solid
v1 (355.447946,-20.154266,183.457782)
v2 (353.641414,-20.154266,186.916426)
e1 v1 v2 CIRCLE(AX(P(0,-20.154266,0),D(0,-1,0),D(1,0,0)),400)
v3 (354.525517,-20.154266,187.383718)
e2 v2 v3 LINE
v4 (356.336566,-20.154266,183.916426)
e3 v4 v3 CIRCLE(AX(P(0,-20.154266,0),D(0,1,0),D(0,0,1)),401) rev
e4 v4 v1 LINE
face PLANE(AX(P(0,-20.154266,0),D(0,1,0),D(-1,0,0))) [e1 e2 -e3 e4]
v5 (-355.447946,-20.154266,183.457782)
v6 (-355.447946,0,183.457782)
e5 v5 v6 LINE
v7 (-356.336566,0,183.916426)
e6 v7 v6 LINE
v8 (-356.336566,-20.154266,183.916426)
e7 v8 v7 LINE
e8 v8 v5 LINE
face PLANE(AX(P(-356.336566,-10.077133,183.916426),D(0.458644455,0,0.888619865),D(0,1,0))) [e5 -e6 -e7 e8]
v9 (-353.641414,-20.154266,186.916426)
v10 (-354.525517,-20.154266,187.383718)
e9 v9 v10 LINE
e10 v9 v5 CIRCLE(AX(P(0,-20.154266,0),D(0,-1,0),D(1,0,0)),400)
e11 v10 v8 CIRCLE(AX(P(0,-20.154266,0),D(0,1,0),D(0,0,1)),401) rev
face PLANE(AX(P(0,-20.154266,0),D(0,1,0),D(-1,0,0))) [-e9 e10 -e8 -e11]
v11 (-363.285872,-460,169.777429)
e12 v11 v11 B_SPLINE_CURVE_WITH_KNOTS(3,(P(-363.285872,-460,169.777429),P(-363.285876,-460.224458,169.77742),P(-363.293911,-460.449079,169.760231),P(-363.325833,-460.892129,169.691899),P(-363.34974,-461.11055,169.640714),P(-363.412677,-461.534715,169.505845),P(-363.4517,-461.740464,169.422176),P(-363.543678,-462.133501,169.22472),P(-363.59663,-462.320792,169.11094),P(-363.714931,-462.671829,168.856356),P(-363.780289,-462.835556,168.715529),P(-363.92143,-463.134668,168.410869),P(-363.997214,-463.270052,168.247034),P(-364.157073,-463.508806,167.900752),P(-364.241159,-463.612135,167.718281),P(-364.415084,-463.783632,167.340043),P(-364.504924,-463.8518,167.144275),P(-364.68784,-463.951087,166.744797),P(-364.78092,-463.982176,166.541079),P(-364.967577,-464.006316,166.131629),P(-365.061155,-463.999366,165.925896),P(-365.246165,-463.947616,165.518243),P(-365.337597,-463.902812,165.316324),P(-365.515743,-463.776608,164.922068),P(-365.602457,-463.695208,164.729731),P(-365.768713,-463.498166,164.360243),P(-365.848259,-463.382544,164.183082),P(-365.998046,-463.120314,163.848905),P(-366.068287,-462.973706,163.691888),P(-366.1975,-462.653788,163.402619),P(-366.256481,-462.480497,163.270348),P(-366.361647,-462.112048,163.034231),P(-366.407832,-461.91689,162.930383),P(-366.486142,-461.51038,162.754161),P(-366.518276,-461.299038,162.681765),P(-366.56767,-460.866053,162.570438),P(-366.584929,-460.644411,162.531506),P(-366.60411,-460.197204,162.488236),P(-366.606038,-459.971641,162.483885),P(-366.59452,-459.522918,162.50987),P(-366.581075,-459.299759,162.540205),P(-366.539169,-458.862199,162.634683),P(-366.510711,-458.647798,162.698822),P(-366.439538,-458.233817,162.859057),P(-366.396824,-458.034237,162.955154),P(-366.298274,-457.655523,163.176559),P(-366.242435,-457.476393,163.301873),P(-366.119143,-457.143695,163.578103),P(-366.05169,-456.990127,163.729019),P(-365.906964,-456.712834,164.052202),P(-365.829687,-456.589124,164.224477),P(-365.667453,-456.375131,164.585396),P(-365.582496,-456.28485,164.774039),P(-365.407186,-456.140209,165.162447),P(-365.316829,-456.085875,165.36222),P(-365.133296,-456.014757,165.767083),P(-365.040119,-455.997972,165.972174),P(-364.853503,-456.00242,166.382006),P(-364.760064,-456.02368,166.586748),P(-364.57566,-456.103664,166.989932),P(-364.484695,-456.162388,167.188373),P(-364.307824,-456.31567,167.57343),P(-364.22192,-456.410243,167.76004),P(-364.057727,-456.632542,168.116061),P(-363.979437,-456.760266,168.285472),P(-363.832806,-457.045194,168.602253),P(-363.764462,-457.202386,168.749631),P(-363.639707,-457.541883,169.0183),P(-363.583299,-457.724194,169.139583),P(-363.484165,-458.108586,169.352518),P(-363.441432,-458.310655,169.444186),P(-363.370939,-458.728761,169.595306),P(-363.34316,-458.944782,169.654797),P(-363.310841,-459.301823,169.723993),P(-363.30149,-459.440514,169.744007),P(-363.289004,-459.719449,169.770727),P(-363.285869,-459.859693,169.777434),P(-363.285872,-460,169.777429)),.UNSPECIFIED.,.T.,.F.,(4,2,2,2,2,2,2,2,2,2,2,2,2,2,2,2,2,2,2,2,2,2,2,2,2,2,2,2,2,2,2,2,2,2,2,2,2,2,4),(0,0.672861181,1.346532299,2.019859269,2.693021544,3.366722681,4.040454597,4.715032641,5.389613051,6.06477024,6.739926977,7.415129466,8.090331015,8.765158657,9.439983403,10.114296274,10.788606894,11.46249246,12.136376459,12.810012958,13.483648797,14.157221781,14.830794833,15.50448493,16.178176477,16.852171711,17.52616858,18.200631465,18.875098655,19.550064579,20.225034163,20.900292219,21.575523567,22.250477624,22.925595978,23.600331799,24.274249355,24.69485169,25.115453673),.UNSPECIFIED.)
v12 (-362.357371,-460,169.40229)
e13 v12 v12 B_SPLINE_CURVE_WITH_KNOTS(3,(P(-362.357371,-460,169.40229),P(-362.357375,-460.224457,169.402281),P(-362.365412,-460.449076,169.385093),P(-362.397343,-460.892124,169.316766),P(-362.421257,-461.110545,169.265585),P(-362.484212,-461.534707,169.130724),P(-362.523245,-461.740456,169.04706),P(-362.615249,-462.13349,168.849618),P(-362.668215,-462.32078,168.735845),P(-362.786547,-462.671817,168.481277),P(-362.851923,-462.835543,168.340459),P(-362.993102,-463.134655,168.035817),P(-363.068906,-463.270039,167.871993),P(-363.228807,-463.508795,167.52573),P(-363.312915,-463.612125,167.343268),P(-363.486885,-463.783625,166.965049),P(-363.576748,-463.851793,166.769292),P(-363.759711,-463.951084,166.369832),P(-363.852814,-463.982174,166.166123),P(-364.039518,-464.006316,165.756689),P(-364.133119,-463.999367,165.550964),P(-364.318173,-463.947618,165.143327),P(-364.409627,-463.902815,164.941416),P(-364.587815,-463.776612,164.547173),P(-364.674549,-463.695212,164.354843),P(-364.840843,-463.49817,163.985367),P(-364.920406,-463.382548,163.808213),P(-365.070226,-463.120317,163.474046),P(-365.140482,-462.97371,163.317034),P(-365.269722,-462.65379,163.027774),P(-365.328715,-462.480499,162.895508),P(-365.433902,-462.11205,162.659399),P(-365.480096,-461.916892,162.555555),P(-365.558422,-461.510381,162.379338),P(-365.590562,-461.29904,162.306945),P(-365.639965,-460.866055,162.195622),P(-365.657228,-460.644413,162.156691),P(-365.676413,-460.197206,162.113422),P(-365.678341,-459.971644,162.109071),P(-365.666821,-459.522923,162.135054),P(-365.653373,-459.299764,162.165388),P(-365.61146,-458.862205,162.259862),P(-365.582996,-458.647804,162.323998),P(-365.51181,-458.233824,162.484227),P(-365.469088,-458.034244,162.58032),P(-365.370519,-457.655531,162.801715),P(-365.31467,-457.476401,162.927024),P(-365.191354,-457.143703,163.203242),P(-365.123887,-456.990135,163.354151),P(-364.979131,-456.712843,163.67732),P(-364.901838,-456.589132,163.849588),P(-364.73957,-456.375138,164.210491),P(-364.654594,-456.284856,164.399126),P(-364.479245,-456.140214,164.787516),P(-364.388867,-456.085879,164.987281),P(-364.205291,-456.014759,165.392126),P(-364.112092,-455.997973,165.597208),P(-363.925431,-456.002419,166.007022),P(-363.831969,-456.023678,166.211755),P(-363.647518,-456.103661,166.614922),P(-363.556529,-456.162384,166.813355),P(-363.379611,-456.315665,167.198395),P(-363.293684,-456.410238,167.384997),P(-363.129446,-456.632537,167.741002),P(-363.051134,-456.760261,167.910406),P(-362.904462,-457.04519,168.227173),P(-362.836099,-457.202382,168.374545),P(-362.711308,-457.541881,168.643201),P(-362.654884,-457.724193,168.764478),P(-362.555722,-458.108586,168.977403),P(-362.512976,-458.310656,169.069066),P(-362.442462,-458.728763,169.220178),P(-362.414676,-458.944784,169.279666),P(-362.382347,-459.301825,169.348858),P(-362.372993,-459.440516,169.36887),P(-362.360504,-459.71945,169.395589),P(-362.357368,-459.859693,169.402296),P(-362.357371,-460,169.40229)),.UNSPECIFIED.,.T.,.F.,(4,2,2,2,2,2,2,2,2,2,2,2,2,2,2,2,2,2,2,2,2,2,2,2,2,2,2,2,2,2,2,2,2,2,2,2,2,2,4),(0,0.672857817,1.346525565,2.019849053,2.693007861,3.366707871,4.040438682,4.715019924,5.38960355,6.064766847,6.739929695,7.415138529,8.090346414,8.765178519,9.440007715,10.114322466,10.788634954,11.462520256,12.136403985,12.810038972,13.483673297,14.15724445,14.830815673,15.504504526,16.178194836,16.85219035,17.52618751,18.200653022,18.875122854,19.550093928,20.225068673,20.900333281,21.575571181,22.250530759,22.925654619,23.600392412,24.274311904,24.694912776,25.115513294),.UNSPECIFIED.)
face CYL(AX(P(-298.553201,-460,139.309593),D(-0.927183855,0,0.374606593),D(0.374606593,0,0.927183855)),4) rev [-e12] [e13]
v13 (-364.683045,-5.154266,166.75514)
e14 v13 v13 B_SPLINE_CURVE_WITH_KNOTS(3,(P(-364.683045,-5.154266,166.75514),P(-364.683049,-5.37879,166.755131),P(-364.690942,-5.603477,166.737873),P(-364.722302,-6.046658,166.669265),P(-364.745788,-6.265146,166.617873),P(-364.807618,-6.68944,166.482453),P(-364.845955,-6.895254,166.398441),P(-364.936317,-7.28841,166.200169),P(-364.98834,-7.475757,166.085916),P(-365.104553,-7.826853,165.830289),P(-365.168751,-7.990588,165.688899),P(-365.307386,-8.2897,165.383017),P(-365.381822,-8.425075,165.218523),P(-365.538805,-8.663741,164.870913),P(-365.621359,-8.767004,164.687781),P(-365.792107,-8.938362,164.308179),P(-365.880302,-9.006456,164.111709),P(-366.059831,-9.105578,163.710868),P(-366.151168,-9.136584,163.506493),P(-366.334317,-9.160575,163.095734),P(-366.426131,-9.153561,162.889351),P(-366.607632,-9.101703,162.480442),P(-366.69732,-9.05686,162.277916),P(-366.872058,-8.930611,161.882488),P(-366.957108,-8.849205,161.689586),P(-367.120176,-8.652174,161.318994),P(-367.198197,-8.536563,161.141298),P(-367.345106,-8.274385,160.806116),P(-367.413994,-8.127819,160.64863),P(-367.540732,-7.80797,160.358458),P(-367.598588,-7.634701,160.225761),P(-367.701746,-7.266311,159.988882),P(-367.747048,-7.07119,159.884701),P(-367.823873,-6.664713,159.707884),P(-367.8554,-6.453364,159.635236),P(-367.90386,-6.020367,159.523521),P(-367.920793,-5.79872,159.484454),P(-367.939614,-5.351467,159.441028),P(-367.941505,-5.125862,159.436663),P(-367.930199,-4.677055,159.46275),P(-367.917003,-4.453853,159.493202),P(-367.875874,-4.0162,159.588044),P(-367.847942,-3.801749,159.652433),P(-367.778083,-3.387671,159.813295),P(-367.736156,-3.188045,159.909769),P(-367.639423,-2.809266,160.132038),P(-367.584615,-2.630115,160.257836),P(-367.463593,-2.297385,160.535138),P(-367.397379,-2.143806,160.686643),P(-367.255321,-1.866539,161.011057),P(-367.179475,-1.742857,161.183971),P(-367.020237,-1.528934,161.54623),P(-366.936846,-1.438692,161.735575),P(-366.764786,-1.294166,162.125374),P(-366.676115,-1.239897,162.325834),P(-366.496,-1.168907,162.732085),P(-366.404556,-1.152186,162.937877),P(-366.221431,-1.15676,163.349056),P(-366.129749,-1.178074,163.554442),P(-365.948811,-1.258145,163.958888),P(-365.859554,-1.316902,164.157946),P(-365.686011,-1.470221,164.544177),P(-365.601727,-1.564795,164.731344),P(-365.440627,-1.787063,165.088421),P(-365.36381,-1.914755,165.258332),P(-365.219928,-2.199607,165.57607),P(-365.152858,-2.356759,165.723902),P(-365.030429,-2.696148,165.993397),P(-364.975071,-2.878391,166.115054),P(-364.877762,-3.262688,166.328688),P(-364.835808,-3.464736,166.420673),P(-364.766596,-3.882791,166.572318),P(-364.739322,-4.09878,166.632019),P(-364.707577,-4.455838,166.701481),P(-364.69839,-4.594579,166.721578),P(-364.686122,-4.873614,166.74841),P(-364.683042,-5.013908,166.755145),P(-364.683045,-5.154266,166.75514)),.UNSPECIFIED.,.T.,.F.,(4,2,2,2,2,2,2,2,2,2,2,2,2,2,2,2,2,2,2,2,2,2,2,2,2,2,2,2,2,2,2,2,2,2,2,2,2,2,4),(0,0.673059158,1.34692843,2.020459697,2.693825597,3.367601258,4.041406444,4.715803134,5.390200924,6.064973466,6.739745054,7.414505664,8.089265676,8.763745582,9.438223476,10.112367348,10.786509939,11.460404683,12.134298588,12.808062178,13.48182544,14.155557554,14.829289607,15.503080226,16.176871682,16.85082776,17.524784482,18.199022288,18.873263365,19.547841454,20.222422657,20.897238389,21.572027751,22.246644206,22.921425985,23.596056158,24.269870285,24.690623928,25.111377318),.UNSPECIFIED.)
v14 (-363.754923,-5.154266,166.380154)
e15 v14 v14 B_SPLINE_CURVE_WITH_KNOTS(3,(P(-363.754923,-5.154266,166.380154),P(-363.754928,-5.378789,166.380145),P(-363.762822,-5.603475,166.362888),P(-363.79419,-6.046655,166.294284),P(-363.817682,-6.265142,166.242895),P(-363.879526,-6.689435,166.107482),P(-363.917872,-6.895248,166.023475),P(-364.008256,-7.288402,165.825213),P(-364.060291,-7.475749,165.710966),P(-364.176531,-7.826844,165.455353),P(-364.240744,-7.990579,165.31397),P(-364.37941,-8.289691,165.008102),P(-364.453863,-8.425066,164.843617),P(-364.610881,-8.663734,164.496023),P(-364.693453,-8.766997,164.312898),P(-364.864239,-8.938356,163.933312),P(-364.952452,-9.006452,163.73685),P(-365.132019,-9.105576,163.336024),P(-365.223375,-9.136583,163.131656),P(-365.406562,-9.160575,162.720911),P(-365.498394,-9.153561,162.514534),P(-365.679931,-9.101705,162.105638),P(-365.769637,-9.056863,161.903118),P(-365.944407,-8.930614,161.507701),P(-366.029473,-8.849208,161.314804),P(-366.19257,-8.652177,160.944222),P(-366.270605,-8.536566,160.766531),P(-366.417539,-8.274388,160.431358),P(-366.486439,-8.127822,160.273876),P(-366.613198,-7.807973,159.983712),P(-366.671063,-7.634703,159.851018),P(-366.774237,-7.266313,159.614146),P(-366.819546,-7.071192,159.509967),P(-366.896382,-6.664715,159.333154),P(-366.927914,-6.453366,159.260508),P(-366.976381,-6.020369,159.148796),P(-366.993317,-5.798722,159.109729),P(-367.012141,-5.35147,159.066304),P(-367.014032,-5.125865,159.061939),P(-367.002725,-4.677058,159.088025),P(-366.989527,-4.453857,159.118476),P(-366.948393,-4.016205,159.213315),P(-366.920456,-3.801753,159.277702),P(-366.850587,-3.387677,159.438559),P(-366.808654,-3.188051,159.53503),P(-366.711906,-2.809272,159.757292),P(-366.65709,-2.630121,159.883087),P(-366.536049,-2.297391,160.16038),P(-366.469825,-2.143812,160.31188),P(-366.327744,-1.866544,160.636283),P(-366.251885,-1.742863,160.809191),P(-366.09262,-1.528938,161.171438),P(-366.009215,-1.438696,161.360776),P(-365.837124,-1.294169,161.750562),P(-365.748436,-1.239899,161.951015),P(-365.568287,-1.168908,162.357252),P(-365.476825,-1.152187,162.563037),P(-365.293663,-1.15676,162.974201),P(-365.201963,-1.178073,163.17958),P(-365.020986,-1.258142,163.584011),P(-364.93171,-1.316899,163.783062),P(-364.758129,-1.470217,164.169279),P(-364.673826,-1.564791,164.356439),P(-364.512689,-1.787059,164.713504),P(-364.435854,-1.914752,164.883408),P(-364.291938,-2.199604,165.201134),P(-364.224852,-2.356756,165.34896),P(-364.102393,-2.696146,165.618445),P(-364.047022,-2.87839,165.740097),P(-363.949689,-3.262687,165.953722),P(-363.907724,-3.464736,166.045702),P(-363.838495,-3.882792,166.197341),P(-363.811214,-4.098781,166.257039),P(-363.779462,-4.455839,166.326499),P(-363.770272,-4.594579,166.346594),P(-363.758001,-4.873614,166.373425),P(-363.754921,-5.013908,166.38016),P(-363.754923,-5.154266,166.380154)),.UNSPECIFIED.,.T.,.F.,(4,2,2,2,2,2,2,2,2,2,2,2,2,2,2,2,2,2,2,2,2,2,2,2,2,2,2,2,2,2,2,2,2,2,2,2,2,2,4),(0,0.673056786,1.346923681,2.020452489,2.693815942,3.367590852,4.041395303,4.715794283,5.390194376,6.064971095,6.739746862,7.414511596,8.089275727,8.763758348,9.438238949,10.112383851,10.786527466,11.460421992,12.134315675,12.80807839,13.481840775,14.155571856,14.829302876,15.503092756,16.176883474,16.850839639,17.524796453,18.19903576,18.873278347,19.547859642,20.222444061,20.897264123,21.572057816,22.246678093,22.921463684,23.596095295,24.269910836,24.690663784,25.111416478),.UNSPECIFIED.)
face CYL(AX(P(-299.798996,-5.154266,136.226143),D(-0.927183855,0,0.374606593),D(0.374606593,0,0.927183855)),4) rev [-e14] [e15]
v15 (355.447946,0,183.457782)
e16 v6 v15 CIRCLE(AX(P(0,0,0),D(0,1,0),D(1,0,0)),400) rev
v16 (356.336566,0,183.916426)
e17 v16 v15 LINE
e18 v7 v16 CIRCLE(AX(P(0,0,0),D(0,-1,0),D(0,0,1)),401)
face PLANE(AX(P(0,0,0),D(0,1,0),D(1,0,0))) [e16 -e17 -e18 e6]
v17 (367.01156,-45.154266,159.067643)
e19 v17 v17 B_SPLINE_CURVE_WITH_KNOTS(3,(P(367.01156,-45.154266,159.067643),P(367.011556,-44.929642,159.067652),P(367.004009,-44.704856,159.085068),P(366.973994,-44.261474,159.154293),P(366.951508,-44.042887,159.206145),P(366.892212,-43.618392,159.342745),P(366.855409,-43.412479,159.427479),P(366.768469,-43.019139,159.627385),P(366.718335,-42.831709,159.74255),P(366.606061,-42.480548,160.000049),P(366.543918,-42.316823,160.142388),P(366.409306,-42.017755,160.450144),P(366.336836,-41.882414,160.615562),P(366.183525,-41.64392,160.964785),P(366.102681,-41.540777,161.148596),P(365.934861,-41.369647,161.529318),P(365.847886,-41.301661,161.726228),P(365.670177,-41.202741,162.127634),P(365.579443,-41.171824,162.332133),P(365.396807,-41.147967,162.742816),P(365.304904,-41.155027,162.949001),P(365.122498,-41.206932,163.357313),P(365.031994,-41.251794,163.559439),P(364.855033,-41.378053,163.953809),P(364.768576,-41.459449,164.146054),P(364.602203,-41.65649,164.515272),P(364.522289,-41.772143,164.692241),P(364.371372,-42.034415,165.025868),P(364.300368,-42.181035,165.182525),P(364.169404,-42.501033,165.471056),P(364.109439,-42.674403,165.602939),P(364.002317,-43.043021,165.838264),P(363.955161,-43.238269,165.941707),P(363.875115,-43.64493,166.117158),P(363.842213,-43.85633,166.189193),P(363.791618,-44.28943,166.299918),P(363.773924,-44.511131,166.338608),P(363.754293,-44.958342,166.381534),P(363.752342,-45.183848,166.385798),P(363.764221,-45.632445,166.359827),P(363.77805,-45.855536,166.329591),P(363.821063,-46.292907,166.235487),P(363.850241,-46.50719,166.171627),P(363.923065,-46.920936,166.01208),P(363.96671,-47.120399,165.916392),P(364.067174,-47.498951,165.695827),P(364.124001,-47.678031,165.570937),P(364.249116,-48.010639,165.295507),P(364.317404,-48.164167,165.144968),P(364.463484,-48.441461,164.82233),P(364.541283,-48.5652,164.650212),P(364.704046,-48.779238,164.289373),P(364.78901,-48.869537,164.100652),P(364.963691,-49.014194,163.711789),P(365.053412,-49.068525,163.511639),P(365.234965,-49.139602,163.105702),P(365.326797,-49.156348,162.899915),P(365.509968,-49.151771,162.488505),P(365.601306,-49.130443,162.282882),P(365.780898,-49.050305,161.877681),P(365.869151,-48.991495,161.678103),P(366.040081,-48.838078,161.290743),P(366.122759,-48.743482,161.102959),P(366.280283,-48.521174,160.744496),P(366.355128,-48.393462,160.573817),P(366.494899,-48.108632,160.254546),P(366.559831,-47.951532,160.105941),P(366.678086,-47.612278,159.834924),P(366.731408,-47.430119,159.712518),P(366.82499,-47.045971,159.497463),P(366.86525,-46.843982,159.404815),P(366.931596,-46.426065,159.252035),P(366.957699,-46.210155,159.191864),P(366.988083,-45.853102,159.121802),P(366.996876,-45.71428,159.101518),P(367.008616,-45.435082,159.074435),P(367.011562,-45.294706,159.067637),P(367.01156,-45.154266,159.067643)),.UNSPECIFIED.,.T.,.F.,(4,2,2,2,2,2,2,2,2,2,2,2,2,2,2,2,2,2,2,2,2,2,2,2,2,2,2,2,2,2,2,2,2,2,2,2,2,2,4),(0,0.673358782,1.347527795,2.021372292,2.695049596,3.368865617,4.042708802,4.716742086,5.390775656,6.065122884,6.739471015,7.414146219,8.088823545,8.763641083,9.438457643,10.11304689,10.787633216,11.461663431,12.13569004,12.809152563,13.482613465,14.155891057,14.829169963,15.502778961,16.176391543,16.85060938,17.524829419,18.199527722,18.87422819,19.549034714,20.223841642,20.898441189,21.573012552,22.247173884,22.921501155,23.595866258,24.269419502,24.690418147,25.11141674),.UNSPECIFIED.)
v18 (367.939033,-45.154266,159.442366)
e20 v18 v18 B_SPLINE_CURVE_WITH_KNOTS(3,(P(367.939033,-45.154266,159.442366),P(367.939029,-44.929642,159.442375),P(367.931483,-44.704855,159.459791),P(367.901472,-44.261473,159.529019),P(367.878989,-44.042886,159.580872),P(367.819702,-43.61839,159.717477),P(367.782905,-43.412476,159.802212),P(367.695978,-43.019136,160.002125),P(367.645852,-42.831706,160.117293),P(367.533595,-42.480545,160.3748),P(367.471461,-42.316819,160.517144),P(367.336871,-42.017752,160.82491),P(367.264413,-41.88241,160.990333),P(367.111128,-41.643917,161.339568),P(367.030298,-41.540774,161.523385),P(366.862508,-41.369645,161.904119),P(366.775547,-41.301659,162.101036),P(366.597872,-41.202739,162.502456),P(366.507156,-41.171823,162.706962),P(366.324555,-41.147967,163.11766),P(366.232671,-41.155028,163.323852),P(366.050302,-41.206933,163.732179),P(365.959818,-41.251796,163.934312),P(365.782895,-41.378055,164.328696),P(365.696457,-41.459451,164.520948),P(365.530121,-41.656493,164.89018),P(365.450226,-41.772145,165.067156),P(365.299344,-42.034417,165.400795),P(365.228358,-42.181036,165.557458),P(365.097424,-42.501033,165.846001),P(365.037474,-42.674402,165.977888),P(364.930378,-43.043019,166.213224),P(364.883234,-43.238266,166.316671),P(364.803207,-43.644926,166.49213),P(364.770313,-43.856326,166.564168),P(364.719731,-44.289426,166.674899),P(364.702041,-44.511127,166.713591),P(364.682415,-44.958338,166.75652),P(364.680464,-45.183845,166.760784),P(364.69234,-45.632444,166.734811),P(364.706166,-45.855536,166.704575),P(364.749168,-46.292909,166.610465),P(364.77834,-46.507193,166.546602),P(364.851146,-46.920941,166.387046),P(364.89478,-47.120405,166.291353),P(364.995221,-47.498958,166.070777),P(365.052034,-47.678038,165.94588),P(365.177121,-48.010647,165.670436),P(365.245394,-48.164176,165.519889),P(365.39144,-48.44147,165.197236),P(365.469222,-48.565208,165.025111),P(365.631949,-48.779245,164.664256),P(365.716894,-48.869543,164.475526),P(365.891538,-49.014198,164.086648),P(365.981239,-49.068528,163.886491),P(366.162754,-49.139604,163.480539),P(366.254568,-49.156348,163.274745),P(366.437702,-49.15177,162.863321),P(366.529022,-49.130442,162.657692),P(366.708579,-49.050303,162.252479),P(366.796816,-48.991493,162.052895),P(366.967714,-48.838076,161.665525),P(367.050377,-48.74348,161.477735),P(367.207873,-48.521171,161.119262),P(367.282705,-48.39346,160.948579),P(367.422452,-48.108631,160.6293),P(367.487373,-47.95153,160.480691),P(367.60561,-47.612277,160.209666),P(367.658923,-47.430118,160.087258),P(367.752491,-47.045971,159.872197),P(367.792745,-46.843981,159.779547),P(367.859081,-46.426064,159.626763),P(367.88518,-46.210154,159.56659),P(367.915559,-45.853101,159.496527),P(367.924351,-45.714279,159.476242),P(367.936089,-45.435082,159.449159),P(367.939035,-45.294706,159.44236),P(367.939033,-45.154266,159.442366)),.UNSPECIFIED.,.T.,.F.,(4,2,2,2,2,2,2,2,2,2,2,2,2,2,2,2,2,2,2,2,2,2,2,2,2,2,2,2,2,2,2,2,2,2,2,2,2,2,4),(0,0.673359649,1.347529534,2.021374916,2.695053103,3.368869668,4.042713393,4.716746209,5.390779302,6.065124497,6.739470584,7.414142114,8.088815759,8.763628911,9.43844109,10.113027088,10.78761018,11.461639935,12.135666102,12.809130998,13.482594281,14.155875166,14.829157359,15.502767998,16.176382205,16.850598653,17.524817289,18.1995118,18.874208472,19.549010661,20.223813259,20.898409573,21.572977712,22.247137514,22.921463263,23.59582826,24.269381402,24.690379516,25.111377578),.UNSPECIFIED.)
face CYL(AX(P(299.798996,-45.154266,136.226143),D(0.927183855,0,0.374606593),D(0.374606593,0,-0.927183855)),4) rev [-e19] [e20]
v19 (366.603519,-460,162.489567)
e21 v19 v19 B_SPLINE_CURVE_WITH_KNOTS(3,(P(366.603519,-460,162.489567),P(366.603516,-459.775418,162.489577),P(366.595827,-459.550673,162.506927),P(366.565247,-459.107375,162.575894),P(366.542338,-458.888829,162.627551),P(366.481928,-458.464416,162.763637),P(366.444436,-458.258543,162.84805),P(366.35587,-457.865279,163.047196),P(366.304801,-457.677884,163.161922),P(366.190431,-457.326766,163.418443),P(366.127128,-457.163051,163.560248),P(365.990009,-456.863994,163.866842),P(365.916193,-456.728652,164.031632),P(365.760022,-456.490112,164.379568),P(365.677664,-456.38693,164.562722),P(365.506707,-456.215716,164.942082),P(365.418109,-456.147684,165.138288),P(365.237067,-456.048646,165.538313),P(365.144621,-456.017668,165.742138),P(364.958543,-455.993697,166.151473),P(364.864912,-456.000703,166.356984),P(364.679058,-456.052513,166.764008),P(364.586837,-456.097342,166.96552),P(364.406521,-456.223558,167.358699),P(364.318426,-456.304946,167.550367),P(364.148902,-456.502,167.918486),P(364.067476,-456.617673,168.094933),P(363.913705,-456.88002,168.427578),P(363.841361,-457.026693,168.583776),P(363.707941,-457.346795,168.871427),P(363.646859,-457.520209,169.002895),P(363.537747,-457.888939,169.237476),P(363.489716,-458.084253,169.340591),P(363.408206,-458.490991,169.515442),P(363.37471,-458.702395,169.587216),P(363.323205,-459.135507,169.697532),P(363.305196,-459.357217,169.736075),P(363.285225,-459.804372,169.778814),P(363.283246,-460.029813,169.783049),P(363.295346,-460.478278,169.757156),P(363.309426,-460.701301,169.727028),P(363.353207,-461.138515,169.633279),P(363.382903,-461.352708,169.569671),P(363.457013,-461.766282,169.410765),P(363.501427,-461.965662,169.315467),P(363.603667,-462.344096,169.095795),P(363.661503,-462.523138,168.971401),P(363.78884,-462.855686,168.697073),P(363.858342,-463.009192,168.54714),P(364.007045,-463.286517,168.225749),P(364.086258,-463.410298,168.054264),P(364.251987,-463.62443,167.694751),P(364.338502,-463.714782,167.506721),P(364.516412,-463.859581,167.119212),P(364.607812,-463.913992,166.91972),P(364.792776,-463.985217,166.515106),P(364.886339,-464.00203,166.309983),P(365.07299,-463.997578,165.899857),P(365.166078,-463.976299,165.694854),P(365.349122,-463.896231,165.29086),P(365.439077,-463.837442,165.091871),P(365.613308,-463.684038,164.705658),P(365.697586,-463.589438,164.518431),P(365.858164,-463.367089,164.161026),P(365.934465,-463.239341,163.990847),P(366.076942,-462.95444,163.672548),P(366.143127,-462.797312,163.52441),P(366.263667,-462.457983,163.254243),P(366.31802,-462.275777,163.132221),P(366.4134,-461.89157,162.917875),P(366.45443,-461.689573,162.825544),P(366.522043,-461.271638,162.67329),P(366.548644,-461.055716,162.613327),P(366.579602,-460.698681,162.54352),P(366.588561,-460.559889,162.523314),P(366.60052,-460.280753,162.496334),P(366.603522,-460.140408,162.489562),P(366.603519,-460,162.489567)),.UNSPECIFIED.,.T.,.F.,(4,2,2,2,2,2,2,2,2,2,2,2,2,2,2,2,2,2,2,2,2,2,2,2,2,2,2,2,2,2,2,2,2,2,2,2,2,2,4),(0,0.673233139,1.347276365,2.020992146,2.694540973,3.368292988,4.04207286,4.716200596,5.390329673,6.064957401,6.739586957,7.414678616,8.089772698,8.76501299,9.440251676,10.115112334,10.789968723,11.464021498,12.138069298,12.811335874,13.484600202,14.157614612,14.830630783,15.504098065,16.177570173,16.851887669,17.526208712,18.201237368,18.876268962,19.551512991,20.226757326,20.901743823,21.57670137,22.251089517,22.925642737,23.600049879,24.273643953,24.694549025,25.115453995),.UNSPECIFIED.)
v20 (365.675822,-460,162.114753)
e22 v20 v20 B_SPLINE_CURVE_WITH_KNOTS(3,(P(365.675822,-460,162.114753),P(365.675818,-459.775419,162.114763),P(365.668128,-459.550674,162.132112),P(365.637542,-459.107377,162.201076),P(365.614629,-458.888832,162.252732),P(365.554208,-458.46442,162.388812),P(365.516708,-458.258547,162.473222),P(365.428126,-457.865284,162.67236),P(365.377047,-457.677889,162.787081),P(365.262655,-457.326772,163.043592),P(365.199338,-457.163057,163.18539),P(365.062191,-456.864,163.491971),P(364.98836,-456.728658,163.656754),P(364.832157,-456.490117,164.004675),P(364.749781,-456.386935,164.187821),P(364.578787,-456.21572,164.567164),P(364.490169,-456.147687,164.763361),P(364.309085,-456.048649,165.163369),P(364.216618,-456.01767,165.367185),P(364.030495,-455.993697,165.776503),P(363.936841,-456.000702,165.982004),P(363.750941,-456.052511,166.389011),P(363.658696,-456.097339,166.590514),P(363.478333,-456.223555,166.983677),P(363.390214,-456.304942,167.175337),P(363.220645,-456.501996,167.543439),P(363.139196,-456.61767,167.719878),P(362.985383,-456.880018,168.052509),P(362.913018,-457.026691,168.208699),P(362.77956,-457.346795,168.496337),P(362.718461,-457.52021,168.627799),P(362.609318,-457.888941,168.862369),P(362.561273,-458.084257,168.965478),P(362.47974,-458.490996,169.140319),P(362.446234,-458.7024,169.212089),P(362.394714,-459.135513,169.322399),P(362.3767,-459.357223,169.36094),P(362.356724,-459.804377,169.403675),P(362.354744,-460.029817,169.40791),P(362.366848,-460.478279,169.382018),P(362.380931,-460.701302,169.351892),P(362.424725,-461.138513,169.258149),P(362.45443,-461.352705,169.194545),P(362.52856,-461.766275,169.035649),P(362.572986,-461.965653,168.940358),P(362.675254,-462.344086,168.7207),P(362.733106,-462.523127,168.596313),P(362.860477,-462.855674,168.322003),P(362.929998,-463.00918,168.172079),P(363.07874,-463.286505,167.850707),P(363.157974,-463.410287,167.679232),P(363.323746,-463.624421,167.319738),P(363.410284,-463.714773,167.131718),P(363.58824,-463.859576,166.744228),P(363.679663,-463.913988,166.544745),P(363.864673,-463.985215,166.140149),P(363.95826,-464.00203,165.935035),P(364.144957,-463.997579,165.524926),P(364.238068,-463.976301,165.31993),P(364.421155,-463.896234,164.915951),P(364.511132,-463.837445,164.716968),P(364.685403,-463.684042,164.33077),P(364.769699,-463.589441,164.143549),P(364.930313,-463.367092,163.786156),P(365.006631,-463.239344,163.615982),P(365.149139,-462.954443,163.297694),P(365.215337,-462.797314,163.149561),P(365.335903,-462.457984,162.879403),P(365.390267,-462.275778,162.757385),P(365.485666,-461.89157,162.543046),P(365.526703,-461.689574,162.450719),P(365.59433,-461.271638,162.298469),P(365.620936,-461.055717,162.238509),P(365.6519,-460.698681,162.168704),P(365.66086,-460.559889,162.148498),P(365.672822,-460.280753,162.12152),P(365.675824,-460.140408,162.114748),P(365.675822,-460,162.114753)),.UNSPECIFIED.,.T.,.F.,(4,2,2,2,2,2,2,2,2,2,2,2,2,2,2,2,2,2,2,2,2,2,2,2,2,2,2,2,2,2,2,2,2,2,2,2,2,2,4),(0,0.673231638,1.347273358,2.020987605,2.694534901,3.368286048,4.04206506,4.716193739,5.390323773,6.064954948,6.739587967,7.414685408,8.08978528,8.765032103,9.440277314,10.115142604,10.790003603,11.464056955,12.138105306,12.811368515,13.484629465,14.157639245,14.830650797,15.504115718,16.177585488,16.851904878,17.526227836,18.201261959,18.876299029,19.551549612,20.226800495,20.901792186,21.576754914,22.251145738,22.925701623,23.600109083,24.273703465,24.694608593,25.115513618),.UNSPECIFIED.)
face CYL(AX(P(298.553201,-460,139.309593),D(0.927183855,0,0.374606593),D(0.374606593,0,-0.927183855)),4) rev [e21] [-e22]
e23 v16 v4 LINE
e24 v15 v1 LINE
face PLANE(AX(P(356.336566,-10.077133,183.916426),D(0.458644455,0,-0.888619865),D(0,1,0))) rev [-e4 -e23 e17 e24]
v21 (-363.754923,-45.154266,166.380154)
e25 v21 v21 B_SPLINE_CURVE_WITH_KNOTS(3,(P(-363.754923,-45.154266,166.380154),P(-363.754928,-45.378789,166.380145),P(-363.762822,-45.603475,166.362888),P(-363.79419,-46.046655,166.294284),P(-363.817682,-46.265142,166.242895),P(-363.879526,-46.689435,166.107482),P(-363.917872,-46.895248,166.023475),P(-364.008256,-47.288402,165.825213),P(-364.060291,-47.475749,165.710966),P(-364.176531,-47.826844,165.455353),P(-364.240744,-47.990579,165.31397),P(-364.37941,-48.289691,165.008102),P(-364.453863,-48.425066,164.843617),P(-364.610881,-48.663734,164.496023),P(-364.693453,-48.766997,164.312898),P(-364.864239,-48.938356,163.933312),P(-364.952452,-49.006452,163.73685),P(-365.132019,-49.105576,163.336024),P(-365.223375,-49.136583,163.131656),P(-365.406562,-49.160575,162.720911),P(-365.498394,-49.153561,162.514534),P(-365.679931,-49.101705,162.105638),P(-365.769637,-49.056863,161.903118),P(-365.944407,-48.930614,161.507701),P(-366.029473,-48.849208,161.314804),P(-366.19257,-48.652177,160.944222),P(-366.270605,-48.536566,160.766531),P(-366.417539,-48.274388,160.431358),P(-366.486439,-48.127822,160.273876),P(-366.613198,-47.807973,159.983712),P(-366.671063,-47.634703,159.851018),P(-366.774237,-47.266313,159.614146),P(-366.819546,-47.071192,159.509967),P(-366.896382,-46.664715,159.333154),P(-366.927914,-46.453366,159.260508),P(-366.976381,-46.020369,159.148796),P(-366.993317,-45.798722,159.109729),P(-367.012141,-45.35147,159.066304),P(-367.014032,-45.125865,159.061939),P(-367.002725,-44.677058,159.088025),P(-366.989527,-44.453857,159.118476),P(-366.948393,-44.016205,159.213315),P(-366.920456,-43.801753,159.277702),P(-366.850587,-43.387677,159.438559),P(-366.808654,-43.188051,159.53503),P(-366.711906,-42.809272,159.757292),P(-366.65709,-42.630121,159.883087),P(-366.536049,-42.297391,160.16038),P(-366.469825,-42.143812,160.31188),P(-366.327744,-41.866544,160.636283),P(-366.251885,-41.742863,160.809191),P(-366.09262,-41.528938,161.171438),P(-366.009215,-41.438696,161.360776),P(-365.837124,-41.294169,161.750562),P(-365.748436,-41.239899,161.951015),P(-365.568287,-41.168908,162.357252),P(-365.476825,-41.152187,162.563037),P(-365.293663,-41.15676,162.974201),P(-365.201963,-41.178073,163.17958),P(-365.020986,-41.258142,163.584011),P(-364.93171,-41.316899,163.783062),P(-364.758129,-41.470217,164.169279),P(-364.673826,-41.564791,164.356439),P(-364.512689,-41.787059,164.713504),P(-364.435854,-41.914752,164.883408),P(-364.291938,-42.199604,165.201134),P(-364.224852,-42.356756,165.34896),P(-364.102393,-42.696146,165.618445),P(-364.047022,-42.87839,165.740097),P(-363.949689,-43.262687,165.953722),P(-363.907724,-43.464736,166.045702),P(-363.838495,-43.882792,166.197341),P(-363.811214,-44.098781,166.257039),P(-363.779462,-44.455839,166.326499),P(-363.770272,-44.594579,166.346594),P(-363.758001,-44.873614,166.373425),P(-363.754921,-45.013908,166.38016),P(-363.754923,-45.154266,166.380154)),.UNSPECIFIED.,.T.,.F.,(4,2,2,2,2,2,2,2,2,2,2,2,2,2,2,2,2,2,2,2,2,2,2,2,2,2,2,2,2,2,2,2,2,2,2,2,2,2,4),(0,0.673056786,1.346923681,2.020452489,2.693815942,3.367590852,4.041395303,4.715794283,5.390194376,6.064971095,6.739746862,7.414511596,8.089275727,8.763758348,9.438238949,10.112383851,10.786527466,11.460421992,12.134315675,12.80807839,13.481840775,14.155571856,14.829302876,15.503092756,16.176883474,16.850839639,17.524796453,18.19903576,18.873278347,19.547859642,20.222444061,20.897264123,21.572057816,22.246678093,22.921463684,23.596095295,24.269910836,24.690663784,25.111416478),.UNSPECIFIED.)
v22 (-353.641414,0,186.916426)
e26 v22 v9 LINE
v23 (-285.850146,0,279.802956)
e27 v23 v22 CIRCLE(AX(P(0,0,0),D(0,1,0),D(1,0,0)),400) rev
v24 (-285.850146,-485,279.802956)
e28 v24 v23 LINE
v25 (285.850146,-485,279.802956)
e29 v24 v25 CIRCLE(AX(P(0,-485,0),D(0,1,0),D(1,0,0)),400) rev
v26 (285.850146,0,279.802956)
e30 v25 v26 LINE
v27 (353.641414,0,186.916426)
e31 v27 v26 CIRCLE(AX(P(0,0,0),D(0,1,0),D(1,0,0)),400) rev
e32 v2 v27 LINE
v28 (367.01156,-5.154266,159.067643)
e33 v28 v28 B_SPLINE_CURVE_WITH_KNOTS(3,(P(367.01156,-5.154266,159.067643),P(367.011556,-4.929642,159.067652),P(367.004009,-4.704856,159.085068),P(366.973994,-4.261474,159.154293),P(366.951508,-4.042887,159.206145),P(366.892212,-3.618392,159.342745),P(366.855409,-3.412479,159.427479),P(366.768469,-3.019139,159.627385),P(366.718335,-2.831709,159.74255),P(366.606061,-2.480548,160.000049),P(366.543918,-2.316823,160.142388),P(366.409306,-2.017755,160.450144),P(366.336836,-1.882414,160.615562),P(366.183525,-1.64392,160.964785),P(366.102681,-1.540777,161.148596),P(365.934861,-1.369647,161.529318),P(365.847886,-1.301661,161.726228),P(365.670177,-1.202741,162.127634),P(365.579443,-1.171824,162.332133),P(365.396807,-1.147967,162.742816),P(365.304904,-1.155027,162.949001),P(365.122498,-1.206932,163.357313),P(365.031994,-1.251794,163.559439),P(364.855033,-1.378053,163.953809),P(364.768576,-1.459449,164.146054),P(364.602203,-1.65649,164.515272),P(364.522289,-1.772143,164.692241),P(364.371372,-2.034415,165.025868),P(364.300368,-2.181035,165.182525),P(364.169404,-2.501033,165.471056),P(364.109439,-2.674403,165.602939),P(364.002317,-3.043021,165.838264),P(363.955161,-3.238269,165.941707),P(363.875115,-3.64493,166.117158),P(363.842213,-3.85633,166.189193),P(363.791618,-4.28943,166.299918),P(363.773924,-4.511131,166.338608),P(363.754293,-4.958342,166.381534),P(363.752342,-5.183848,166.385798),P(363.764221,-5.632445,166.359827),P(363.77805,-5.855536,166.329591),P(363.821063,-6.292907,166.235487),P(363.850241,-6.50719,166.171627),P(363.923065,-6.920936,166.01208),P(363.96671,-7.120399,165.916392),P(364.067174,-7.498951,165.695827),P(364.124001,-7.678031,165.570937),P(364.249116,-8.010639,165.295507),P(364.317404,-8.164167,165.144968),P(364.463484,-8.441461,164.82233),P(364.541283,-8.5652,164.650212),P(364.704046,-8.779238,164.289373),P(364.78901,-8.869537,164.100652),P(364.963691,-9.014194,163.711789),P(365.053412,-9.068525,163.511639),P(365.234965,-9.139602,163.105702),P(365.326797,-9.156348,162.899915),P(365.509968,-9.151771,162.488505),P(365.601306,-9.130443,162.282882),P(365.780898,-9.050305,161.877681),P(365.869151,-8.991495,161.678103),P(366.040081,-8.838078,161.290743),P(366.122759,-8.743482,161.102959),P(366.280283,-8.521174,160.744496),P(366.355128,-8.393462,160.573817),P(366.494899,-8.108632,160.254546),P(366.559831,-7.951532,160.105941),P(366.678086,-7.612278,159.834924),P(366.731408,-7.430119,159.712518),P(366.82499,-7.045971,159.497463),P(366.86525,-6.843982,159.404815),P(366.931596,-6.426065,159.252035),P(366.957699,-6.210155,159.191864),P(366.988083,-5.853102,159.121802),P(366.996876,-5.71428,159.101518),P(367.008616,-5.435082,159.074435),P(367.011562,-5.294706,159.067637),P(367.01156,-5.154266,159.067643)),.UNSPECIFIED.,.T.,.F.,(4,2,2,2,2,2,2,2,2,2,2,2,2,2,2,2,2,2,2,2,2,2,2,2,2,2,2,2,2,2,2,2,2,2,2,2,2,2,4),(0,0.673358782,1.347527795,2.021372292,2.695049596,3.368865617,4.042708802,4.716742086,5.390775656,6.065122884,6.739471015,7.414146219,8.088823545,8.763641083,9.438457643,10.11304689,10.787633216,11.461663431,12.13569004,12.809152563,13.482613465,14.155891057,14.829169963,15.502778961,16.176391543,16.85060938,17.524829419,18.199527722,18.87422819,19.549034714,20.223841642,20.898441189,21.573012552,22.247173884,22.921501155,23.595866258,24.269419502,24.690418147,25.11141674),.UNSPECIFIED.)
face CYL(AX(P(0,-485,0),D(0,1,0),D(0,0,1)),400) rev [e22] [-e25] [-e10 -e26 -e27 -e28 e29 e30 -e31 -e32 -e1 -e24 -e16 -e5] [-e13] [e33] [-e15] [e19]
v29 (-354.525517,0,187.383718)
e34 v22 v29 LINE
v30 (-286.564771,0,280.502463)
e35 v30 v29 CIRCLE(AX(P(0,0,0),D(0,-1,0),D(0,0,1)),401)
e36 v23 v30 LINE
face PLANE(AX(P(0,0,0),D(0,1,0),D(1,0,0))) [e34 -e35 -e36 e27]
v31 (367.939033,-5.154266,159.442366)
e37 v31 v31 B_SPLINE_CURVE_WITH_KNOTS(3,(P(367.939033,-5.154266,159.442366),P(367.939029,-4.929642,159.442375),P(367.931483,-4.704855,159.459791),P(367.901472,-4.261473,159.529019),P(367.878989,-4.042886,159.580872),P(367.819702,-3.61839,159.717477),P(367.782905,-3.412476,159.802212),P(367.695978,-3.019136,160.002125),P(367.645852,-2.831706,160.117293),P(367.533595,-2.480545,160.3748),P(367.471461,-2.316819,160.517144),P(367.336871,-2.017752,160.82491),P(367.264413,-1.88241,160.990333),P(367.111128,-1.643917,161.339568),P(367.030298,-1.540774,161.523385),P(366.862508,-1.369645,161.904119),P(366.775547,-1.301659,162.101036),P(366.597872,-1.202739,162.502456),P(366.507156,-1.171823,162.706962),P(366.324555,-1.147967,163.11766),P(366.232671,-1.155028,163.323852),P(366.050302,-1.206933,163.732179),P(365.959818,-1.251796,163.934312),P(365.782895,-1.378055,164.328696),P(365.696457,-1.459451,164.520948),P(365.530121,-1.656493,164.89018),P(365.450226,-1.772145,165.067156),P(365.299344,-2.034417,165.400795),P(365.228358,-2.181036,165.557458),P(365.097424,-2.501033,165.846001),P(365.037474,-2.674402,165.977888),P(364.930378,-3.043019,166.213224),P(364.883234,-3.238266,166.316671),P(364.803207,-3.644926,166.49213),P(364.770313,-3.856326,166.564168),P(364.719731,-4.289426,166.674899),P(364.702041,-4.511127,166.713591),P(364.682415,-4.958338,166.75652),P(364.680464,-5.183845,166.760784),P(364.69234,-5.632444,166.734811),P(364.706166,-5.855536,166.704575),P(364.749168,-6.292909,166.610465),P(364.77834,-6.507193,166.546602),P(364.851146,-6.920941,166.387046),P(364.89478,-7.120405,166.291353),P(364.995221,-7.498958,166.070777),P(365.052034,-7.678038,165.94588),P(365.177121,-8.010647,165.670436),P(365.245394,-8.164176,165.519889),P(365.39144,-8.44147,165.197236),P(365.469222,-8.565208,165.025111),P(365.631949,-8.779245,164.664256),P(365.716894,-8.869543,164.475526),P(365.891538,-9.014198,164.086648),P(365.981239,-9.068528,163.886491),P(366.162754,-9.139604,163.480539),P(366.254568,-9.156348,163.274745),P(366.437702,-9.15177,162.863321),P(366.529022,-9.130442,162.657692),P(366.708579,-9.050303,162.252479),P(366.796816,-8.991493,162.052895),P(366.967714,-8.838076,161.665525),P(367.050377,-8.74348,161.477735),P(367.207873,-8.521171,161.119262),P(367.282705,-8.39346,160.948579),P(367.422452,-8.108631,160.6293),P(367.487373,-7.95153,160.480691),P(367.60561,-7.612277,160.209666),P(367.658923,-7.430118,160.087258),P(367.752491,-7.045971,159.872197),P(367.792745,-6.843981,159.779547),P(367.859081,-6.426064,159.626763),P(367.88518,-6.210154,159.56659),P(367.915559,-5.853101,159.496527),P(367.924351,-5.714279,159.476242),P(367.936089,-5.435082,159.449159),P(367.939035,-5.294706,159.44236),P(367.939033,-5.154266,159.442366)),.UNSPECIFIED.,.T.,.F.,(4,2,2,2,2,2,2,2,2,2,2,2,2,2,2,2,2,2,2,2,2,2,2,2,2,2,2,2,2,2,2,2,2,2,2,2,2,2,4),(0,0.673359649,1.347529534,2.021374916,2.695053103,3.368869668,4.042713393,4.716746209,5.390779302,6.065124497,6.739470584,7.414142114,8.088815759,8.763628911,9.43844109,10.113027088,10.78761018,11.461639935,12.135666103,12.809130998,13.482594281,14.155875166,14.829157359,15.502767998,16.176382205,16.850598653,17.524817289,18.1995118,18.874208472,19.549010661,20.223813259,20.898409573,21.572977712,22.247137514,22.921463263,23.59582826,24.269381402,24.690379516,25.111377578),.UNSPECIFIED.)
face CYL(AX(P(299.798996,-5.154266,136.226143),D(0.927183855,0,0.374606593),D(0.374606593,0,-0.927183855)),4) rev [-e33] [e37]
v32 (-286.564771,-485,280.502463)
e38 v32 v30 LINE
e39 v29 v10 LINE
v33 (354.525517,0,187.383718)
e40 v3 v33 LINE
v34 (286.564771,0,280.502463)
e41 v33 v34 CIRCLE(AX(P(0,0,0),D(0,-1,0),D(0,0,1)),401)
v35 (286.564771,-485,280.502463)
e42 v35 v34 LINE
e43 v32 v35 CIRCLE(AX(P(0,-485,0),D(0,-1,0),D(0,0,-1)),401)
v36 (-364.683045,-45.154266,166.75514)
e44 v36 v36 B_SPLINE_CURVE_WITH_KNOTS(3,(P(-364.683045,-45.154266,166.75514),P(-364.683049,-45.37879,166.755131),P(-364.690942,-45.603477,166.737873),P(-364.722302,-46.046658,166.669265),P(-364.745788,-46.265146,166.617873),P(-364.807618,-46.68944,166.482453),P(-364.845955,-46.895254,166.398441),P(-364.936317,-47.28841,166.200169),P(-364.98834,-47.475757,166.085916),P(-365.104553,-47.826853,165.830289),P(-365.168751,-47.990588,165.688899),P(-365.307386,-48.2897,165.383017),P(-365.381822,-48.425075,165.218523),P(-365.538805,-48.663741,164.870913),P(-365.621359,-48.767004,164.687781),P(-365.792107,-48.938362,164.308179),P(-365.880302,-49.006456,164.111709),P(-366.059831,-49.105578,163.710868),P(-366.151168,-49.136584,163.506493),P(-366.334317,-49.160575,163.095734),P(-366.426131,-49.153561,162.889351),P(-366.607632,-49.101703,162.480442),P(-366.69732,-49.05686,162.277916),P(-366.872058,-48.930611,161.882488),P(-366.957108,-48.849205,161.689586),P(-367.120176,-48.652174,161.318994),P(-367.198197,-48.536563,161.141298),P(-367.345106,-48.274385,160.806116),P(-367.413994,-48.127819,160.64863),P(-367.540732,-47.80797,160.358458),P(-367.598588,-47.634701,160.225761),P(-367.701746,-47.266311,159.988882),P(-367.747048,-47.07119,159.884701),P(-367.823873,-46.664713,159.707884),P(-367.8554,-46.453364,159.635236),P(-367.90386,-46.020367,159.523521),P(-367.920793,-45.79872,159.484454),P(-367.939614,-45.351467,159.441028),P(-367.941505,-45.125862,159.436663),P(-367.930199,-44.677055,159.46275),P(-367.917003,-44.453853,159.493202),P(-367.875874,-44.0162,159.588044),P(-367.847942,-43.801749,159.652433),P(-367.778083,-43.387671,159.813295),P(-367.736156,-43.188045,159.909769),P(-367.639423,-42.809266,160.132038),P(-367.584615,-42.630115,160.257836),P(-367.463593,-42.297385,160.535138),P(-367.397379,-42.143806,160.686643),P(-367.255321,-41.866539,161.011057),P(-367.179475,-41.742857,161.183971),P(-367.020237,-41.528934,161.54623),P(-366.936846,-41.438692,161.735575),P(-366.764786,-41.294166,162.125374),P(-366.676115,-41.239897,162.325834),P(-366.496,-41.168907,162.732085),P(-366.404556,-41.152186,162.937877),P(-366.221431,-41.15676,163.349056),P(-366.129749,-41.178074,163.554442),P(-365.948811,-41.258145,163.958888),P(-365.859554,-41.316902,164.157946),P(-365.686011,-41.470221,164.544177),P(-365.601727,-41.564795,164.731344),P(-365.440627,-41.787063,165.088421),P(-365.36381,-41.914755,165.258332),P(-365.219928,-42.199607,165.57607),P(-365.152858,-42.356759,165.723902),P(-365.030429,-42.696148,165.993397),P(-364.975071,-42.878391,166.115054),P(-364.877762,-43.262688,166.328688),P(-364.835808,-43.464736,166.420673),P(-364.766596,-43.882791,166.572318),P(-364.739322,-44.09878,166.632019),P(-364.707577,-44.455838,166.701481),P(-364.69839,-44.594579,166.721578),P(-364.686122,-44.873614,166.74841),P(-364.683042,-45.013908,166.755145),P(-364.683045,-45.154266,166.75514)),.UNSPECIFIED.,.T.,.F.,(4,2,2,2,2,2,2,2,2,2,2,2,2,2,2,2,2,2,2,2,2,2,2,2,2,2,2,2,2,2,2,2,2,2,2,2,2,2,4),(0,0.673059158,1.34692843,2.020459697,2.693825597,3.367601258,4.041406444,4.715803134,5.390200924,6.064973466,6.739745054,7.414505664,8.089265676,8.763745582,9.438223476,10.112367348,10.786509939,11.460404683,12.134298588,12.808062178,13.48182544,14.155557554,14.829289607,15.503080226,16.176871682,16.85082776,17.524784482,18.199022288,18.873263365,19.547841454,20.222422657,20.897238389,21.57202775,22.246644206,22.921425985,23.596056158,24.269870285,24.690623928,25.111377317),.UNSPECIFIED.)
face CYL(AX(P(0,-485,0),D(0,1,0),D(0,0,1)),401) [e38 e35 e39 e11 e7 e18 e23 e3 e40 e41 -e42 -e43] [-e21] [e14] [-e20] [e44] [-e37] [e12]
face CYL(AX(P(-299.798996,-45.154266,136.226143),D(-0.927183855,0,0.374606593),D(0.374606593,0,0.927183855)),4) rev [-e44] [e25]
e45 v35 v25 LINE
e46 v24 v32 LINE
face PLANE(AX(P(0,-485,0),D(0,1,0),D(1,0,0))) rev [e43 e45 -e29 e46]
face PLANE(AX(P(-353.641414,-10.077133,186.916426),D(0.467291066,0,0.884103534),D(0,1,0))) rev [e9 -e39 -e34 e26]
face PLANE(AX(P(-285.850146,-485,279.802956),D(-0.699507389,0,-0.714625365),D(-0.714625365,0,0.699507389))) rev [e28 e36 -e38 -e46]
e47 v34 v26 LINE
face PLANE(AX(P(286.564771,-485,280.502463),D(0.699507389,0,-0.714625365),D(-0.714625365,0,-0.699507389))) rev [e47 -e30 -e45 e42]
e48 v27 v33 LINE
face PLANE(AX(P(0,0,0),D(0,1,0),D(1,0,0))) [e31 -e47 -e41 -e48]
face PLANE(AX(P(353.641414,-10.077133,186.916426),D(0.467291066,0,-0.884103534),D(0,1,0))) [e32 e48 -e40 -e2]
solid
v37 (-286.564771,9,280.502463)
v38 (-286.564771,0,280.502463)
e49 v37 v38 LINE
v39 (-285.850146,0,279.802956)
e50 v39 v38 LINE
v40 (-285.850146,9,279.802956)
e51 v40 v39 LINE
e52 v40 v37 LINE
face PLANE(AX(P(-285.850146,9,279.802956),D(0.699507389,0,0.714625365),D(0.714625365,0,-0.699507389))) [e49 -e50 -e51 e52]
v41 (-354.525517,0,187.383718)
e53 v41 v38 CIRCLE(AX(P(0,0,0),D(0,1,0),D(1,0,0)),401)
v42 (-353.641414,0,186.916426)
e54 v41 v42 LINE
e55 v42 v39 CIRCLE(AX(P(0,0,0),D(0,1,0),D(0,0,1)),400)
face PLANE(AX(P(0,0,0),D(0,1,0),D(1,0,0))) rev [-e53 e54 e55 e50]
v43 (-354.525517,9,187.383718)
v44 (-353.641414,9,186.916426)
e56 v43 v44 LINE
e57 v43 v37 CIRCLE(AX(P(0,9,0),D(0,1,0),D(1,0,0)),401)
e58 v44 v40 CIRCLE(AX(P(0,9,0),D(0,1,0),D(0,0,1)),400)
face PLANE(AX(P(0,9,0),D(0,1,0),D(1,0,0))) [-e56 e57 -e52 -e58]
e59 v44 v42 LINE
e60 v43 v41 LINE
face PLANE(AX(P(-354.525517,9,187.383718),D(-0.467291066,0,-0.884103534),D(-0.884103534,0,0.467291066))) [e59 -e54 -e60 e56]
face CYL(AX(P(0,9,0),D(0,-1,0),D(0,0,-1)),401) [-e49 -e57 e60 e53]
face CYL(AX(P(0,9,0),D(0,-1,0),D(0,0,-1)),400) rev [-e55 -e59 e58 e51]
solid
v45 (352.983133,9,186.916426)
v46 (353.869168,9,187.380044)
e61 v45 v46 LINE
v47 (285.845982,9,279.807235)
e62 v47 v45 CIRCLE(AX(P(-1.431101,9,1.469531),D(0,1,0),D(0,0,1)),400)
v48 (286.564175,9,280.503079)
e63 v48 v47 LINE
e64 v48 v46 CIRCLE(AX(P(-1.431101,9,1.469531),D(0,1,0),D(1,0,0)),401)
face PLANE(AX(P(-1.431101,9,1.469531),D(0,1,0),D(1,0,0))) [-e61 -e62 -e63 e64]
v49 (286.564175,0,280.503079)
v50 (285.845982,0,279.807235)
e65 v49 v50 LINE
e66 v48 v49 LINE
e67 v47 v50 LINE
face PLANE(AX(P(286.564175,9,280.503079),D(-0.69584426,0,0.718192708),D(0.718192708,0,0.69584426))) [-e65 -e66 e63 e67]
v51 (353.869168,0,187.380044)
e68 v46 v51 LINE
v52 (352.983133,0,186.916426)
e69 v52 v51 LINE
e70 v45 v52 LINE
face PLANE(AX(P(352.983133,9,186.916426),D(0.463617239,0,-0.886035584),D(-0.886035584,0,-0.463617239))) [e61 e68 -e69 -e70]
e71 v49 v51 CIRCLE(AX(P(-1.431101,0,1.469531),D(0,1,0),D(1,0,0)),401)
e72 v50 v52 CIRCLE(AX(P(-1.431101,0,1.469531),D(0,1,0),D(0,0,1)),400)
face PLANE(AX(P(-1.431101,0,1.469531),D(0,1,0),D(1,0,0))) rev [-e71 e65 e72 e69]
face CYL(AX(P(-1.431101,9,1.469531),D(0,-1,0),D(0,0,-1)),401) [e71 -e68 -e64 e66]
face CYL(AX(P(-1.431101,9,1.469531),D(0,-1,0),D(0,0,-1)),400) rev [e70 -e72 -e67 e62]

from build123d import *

# Parameters (mm, degrees)
SM_BASE_FLANGE_1_DEPTH = 485
CUT_EXTRUDE_START      = -20.154266119
CUT_EXTRUDE_5_DEPTH    = 20.154266119
SM_START               = 9
SM_BASE_FLANGE_3_DEPTH = 9
SM_BASE_FLANGE_4_DEPTH = 9
SKETCH_12_R            = 4
CUT_EXTRUDE_6_DEPTH    = 80


# Read off the part's stored shape, not the designer's step: Вырез-Вытянуть5
# Sheet-metal steps are written as plain solids
with BuildPart() as part:
    # Sketch 1 → Базовая кромка1 (new body)
    with BuildSketch(Plane(origin=(0, 0, 0), x_dir=(1, 0, 0), z_dir=(0, 1, 0))):
        with BuildLine():
            ThreePointArc((-286.564771423, -280.502463054), (-372.783196213, -147.762270629), (-400.920191559, 8))
            ThreePointArc((-400.920191559, 8), (0, 401), (400.920191559, 8))
            ThreePointArc((400.920191559, 8), (372.783196213, -147.762270629), (286.564771423, -280.502463054))
            Line((286.564771423, -280.502463054), (285.850146058, -279.802955665))
            ThreePointArc((285.850146058, -279.802955665), (371.853562307, -147.393786163), (399.920390583, 7.980049875))
            ThreePointArc((399.920390583, 7.980049875), (0, 400), (-399.920390583, 7.980049875))
            ThreePointArc((-399.920390583, 7.980049875), (-371.853562307, -147.393786163), (-285.850146058, -279.802955665))
            Line((-285.850146058, -279.802955665), (-286.564771423, -280.502463054))
        make_face()
    extrude(amount=-SM_BASE_FLANGE_1_DEPTH)

    # Вырез-Вытянуть5 outline → Вырез-Вытянуть5 (cut)
    with BuildSketch(Plane(origin=(0, 0, 0), x_dir=(1, 0, 0), z_dir=(0, 1, 0)).offset(CUT_EXTRUDE_START)):
        with BuildLine():
            Line((353.641413762, -186.916426438), (354.525517296, -187.383717505))
            ThreePointArc((354.525517296, -187.383717505), (355.435269498, -185.652280345), (356.336565744, -183.916426438))
            Line((356.336565744, -183.916426438), (355.447945879, -183.457781984))
            ThreePointArc((355.447945879, -183.457781984), (354.548897255, -185.189307077), (353.641413762, -186.916426438))
        make_face()
        with BuildLine():
            Line((-355.447945879, -183.457781984), (-356.336565744, -183.916426438))
            ThreePointArc((-356.336565744, -183.916426438), (-355.435269498, -185.652280345), (-354.525517296, -187.383717505))
            Line((-354.525517296, -187.383717505), (-353.641413762, -186.916426438))
            ThreePointArc((-353.641413762, -186.916426438), (-354.548897255, -185.189307077), (-355.447945879, -183.457781984))
        make_face()
    extrude(amount=CUT_EXTRUDE_5_DEPTH, mode=Mode.SUBTRACT)

    # Эскиз12 → Вырез-Вытянуть6 (cut)
    with BuildSketch(Plane(origin=(-379.218196518, 0, 153.214096707), x_dir=(0.37460659341590985, 0, 0.9271838545667883), z_dir=(-0.9271838545667883, 0, 0.37460659341590985))):
        with Locations((14, -45.154266119)):
            Circle(SKETCH_12_R)
        with Locations((14, -5.154266119)):
            Circle(SKETCH_12_R)
        with Locations((17.325607974, -460)):
            Circle(SKETCH_12_R)
    cut_extrude_6 = extrude(amount=-CUT_EXTRUDE_6_DEPTH, mode=Mode.SUBTRACT)

    # Зеркальное отражение2: Вырез-Вытянуть6 across plane
    add(cut_extrude_6.mirror(Plane(origin=(0, 0, 0), x_dir=(0, 0, 1), z_dir=(1, 0, 0))), mode=Mode.SUBTRACT)


with BuildPart() as body_2:
    # Эскиз9 → Базовая кромка3 (new body)
    with BuildSketch(Plane(origin=(0, 0, 0), x_dir=(1, 0, 0), z_dir=(0, 1, 0)).offset(SM_START)):
        with BuildLine():
            ThreePointArc((-353.641413762, -186.916426438), (-323.101130605, -235.808522751), (-285.850146058, -279.802955665))
            Line((-285.850146058, -279.802955665), (-286.564771423, -280.502463054))
            ThreePointArc((-286.564771423, -280.502463054), (-323.908883431, -236.398044058), (-354.525517296, -187.383717505))
            Line((-354.525517296, -187.383717505), (-353.641413762, -186.916426438))
        make_face()
    extrude(amount=-SM_BASE_FLANGE_3_DEPTH)


with BuildPart() as body_3:
    # Эскиз11 → Базовая кромка4 (new body)
    with BuildSketch(Plane(origin=(0, 0, 0), x_dir=(1, 0, 0), z_dir=(0, 1, 0))):
        with BuildLine():
            ThreePointArc((285.845982484, -279.807234702), (322.758831311, -235.778915861), (352.983132723, -186.916426438))
            Line((352.983132723, -186.916426438), (353.869168307, -187.380043678))
            ThreePointArc((353.869168307, -187.380043678), (323.569306141, -236.364689324), (286.564175192, -280.503078962))
            Line((286.564175192, -280.503078962), (285.845982484, -279.807234702))
        make_face()
    extrude(amount=SM_BASE_FLANGE_4_DEPTH)


solid = Compound([part.part, body_2.part, body_3.part])
